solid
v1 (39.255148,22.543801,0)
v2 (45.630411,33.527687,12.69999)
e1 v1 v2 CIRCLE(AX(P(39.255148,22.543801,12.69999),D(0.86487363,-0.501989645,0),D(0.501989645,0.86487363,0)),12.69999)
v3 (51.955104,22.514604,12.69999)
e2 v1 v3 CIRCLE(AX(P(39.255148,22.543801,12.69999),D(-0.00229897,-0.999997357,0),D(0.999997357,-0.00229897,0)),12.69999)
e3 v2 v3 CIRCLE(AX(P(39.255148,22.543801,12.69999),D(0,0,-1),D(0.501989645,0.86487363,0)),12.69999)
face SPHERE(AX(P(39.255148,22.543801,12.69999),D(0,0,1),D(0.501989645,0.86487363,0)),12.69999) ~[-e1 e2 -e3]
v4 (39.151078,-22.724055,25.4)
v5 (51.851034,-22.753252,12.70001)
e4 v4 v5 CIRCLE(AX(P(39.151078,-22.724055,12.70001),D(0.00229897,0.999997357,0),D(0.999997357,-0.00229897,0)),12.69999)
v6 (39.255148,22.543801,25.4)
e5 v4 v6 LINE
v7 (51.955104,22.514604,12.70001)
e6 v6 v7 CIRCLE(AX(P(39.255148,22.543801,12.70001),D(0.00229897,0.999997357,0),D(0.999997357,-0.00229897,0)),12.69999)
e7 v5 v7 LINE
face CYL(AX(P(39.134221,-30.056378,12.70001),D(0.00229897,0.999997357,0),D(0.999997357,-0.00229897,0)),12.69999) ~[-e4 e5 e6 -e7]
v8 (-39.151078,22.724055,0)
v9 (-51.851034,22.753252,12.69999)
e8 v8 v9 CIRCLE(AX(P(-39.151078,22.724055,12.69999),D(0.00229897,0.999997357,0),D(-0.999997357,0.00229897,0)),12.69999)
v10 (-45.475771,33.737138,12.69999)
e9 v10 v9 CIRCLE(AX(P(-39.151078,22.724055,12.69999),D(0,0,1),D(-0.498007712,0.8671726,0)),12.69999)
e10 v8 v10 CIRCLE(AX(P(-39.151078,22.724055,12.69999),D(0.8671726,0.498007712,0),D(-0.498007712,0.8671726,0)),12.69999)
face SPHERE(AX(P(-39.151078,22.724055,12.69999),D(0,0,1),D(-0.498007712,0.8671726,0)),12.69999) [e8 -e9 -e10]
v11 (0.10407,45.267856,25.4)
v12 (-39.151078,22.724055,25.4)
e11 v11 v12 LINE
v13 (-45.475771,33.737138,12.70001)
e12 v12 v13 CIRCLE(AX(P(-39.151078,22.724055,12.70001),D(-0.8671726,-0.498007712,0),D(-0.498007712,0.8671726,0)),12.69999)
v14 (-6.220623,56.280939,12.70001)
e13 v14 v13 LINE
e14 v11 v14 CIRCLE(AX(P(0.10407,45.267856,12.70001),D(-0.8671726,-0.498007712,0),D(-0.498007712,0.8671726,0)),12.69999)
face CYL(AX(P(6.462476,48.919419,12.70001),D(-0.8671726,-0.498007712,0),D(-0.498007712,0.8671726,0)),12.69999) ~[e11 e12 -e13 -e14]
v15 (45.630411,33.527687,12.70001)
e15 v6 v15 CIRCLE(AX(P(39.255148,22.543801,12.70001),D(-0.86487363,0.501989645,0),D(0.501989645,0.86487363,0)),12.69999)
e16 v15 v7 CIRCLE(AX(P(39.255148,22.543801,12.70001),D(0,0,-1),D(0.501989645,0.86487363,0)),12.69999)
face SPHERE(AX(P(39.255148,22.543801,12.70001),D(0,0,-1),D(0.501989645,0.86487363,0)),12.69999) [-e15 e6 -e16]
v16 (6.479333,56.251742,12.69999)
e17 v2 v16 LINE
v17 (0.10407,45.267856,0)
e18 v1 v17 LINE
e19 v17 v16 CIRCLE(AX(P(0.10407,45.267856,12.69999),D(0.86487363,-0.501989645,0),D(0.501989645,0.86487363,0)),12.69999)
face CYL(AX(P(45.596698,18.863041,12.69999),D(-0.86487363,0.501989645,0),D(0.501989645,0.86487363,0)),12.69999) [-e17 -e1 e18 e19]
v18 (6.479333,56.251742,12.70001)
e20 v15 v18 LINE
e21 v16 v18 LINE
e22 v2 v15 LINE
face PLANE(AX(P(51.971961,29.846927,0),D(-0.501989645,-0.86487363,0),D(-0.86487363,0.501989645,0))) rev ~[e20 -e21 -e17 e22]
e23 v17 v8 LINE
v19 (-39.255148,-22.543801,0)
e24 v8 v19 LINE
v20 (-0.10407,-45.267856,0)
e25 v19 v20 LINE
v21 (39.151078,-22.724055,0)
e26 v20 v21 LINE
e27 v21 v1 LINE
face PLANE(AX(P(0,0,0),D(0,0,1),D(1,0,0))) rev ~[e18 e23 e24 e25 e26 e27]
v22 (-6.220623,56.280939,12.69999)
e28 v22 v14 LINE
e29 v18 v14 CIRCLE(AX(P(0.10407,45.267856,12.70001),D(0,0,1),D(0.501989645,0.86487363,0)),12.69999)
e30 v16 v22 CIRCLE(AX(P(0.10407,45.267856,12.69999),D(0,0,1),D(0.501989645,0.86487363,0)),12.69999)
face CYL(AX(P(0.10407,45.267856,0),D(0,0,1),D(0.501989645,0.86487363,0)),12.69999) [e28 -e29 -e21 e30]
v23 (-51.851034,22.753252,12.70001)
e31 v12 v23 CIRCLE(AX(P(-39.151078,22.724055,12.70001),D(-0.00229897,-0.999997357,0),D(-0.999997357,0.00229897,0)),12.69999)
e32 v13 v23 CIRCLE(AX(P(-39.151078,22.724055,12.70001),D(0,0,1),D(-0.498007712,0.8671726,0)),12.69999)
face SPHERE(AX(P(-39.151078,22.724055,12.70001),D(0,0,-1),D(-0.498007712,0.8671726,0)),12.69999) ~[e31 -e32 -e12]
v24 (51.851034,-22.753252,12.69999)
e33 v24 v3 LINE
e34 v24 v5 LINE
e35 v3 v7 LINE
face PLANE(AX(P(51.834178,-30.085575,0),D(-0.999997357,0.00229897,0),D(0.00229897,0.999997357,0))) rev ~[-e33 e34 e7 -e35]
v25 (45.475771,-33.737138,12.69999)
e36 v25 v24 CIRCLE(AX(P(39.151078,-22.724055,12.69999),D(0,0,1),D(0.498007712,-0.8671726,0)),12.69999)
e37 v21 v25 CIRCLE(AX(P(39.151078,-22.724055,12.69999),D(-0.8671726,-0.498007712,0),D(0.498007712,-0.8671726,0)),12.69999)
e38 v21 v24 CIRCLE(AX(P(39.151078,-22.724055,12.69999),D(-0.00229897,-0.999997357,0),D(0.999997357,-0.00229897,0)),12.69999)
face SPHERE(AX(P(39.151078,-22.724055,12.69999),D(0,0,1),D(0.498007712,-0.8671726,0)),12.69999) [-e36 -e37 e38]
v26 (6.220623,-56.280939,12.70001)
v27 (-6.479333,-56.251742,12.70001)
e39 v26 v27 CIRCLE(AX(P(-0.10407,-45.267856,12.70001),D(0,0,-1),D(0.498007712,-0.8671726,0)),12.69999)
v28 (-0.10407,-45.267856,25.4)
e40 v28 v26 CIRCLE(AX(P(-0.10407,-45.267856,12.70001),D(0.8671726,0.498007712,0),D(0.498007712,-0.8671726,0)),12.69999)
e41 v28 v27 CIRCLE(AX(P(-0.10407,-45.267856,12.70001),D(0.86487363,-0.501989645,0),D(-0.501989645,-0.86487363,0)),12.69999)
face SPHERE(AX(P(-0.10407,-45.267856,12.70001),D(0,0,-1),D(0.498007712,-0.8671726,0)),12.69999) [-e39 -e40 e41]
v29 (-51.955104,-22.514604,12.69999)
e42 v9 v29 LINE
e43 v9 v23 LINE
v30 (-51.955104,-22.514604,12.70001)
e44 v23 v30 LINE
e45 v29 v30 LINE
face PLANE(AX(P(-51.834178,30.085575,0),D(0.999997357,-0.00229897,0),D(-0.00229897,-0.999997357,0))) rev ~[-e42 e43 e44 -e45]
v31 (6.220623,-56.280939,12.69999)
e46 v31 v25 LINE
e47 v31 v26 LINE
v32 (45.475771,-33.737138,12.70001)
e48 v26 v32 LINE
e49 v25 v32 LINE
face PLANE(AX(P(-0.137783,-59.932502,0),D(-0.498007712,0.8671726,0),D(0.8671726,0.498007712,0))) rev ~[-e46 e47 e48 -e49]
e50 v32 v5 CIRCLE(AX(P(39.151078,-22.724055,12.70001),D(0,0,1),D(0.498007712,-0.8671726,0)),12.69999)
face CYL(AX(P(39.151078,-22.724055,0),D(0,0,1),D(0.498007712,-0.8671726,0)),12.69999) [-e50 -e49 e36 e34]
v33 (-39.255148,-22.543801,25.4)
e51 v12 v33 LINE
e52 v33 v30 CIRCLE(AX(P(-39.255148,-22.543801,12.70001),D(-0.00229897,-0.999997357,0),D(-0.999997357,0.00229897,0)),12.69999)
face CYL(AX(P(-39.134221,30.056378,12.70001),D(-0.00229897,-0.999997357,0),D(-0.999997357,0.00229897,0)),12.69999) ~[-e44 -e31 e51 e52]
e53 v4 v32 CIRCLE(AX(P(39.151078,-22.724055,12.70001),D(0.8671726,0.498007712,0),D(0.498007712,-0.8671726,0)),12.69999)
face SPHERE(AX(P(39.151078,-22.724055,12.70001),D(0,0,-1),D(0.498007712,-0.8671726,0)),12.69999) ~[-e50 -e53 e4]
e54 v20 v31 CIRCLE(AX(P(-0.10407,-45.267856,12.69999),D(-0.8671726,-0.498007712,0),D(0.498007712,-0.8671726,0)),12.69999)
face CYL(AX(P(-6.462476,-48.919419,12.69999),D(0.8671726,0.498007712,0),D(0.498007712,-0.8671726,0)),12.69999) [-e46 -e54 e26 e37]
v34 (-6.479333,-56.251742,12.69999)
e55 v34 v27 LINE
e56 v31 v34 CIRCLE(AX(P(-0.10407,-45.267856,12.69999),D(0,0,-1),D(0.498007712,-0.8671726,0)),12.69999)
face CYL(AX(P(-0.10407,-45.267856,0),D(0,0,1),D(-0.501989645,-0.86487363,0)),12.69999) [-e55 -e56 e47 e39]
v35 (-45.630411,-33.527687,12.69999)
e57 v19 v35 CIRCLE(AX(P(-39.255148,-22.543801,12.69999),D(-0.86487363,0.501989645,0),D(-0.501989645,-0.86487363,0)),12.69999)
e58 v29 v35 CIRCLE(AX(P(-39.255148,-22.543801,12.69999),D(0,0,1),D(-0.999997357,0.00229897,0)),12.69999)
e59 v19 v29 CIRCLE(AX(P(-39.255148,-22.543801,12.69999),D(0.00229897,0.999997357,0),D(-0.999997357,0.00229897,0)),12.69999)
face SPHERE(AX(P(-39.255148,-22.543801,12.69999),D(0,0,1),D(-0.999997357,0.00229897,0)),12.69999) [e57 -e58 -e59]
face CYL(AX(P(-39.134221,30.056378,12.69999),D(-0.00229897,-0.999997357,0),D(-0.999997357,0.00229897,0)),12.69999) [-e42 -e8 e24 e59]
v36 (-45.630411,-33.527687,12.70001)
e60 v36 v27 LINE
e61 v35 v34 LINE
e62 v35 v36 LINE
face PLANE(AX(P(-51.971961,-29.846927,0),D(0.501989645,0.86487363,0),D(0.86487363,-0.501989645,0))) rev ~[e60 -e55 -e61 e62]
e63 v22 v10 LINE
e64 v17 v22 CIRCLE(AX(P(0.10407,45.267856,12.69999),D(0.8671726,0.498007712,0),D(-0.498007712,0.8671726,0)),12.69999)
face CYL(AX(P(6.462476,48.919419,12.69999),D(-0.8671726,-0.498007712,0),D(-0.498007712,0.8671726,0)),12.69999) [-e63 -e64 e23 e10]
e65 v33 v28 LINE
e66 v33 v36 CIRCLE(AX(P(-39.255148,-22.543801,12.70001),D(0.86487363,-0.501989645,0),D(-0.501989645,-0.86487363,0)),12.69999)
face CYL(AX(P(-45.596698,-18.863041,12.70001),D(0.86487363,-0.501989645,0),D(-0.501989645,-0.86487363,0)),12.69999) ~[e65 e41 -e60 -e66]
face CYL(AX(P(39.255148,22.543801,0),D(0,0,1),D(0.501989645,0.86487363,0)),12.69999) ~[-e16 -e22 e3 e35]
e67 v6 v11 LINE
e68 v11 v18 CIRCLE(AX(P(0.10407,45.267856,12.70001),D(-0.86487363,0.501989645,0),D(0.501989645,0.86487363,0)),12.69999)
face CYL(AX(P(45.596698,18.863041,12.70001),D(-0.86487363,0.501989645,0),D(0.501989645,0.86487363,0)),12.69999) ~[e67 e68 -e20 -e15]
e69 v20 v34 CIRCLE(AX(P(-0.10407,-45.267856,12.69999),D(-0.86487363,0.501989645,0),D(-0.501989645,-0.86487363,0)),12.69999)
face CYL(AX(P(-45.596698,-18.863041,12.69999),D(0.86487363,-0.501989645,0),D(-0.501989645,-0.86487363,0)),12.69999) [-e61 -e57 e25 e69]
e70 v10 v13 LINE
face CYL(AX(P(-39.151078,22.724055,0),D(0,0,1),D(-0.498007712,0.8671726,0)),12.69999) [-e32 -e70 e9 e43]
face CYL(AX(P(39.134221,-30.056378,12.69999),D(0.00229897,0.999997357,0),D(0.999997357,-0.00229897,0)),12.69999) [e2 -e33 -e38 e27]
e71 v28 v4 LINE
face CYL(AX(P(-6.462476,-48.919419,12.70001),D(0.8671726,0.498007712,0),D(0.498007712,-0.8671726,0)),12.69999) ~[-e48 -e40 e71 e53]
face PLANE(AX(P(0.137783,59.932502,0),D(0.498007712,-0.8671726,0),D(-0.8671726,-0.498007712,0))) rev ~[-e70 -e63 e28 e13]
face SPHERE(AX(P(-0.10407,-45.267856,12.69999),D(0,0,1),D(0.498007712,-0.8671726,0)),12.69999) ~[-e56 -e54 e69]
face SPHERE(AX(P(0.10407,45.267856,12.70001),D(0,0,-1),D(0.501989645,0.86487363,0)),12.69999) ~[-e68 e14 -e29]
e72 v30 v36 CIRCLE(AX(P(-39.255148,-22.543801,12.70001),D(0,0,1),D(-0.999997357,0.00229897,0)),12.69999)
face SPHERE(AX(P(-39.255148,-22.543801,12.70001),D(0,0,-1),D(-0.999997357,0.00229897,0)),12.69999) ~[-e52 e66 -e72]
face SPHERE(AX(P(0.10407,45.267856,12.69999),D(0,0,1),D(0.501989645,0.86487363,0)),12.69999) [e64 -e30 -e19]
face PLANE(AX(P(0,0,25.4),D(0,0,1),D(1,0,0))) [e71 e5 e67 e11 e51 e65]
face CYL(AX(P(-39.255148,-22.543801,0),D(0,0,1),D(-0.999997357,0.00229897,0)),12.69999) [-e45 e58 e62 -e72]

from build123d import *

# Parameters (mm, degrees)
F1_DEPTH = 25.4
F2_R     = 12.69999


# Not quite as in the source:
# - a fillet or chamfer is up to 0.001 mm smaller than in the source, because OpenCascade refuses the exact size


with BuildPart() as f1:
    # F0 (on Top) → F1 (new body)
    with BuildSketch(Plane.XY):
        Polygon((51.9719609901, 29.8469270905), (0.1377834097, 59.9325020472), (-51.8341775803, 30.0855749566), (-51.9719609901, -29.8469270905), (-0.1377834097, -59.9325020472), (51.8341775803, -30.0855749566), align=None)
    extrude(amount=F1_DEPTH)

    # F2 (radius 12.7 in the source; OpenCascade refuses exactly that, so slightly less here)
    f2_edges = [f1.edges().sort_by_distance(p)[0] for p in [
        (51.971961, 29.846927, 12.7),
        (0.137783, 59.932502, 12.7),
        (26.054872, 44.889715, 0),
        (26.054872, 44.889715, 25.4),
        (-51.834178, 30.085575, 12.7),
        (-25.848197, 45.009039, 0),
        (-25.848197, 45.009039, 25.4),
        (-51.971961, -29.846927, 12.7),
        (-51.903069, 0.119324, 0),
        (-51.903069, 0.119324, 25.4),
        (-0.137783, -59.932502, 12.7),
        (51.834178, -30.085575, 12.7),
        (25.848197, -45.009039, 0),
        (25.848197, -45.009039, 25.4),
        (-26.054872, -44.889715, 0),
        (-26.054872, -44.889715, 25.4),
        (51.903069, -0.119324, 0),
        (51.903069, -0.119324, 25.4),
    ]]
    fillet(f2_edges, radius=F2_R)


solid = f1.part
